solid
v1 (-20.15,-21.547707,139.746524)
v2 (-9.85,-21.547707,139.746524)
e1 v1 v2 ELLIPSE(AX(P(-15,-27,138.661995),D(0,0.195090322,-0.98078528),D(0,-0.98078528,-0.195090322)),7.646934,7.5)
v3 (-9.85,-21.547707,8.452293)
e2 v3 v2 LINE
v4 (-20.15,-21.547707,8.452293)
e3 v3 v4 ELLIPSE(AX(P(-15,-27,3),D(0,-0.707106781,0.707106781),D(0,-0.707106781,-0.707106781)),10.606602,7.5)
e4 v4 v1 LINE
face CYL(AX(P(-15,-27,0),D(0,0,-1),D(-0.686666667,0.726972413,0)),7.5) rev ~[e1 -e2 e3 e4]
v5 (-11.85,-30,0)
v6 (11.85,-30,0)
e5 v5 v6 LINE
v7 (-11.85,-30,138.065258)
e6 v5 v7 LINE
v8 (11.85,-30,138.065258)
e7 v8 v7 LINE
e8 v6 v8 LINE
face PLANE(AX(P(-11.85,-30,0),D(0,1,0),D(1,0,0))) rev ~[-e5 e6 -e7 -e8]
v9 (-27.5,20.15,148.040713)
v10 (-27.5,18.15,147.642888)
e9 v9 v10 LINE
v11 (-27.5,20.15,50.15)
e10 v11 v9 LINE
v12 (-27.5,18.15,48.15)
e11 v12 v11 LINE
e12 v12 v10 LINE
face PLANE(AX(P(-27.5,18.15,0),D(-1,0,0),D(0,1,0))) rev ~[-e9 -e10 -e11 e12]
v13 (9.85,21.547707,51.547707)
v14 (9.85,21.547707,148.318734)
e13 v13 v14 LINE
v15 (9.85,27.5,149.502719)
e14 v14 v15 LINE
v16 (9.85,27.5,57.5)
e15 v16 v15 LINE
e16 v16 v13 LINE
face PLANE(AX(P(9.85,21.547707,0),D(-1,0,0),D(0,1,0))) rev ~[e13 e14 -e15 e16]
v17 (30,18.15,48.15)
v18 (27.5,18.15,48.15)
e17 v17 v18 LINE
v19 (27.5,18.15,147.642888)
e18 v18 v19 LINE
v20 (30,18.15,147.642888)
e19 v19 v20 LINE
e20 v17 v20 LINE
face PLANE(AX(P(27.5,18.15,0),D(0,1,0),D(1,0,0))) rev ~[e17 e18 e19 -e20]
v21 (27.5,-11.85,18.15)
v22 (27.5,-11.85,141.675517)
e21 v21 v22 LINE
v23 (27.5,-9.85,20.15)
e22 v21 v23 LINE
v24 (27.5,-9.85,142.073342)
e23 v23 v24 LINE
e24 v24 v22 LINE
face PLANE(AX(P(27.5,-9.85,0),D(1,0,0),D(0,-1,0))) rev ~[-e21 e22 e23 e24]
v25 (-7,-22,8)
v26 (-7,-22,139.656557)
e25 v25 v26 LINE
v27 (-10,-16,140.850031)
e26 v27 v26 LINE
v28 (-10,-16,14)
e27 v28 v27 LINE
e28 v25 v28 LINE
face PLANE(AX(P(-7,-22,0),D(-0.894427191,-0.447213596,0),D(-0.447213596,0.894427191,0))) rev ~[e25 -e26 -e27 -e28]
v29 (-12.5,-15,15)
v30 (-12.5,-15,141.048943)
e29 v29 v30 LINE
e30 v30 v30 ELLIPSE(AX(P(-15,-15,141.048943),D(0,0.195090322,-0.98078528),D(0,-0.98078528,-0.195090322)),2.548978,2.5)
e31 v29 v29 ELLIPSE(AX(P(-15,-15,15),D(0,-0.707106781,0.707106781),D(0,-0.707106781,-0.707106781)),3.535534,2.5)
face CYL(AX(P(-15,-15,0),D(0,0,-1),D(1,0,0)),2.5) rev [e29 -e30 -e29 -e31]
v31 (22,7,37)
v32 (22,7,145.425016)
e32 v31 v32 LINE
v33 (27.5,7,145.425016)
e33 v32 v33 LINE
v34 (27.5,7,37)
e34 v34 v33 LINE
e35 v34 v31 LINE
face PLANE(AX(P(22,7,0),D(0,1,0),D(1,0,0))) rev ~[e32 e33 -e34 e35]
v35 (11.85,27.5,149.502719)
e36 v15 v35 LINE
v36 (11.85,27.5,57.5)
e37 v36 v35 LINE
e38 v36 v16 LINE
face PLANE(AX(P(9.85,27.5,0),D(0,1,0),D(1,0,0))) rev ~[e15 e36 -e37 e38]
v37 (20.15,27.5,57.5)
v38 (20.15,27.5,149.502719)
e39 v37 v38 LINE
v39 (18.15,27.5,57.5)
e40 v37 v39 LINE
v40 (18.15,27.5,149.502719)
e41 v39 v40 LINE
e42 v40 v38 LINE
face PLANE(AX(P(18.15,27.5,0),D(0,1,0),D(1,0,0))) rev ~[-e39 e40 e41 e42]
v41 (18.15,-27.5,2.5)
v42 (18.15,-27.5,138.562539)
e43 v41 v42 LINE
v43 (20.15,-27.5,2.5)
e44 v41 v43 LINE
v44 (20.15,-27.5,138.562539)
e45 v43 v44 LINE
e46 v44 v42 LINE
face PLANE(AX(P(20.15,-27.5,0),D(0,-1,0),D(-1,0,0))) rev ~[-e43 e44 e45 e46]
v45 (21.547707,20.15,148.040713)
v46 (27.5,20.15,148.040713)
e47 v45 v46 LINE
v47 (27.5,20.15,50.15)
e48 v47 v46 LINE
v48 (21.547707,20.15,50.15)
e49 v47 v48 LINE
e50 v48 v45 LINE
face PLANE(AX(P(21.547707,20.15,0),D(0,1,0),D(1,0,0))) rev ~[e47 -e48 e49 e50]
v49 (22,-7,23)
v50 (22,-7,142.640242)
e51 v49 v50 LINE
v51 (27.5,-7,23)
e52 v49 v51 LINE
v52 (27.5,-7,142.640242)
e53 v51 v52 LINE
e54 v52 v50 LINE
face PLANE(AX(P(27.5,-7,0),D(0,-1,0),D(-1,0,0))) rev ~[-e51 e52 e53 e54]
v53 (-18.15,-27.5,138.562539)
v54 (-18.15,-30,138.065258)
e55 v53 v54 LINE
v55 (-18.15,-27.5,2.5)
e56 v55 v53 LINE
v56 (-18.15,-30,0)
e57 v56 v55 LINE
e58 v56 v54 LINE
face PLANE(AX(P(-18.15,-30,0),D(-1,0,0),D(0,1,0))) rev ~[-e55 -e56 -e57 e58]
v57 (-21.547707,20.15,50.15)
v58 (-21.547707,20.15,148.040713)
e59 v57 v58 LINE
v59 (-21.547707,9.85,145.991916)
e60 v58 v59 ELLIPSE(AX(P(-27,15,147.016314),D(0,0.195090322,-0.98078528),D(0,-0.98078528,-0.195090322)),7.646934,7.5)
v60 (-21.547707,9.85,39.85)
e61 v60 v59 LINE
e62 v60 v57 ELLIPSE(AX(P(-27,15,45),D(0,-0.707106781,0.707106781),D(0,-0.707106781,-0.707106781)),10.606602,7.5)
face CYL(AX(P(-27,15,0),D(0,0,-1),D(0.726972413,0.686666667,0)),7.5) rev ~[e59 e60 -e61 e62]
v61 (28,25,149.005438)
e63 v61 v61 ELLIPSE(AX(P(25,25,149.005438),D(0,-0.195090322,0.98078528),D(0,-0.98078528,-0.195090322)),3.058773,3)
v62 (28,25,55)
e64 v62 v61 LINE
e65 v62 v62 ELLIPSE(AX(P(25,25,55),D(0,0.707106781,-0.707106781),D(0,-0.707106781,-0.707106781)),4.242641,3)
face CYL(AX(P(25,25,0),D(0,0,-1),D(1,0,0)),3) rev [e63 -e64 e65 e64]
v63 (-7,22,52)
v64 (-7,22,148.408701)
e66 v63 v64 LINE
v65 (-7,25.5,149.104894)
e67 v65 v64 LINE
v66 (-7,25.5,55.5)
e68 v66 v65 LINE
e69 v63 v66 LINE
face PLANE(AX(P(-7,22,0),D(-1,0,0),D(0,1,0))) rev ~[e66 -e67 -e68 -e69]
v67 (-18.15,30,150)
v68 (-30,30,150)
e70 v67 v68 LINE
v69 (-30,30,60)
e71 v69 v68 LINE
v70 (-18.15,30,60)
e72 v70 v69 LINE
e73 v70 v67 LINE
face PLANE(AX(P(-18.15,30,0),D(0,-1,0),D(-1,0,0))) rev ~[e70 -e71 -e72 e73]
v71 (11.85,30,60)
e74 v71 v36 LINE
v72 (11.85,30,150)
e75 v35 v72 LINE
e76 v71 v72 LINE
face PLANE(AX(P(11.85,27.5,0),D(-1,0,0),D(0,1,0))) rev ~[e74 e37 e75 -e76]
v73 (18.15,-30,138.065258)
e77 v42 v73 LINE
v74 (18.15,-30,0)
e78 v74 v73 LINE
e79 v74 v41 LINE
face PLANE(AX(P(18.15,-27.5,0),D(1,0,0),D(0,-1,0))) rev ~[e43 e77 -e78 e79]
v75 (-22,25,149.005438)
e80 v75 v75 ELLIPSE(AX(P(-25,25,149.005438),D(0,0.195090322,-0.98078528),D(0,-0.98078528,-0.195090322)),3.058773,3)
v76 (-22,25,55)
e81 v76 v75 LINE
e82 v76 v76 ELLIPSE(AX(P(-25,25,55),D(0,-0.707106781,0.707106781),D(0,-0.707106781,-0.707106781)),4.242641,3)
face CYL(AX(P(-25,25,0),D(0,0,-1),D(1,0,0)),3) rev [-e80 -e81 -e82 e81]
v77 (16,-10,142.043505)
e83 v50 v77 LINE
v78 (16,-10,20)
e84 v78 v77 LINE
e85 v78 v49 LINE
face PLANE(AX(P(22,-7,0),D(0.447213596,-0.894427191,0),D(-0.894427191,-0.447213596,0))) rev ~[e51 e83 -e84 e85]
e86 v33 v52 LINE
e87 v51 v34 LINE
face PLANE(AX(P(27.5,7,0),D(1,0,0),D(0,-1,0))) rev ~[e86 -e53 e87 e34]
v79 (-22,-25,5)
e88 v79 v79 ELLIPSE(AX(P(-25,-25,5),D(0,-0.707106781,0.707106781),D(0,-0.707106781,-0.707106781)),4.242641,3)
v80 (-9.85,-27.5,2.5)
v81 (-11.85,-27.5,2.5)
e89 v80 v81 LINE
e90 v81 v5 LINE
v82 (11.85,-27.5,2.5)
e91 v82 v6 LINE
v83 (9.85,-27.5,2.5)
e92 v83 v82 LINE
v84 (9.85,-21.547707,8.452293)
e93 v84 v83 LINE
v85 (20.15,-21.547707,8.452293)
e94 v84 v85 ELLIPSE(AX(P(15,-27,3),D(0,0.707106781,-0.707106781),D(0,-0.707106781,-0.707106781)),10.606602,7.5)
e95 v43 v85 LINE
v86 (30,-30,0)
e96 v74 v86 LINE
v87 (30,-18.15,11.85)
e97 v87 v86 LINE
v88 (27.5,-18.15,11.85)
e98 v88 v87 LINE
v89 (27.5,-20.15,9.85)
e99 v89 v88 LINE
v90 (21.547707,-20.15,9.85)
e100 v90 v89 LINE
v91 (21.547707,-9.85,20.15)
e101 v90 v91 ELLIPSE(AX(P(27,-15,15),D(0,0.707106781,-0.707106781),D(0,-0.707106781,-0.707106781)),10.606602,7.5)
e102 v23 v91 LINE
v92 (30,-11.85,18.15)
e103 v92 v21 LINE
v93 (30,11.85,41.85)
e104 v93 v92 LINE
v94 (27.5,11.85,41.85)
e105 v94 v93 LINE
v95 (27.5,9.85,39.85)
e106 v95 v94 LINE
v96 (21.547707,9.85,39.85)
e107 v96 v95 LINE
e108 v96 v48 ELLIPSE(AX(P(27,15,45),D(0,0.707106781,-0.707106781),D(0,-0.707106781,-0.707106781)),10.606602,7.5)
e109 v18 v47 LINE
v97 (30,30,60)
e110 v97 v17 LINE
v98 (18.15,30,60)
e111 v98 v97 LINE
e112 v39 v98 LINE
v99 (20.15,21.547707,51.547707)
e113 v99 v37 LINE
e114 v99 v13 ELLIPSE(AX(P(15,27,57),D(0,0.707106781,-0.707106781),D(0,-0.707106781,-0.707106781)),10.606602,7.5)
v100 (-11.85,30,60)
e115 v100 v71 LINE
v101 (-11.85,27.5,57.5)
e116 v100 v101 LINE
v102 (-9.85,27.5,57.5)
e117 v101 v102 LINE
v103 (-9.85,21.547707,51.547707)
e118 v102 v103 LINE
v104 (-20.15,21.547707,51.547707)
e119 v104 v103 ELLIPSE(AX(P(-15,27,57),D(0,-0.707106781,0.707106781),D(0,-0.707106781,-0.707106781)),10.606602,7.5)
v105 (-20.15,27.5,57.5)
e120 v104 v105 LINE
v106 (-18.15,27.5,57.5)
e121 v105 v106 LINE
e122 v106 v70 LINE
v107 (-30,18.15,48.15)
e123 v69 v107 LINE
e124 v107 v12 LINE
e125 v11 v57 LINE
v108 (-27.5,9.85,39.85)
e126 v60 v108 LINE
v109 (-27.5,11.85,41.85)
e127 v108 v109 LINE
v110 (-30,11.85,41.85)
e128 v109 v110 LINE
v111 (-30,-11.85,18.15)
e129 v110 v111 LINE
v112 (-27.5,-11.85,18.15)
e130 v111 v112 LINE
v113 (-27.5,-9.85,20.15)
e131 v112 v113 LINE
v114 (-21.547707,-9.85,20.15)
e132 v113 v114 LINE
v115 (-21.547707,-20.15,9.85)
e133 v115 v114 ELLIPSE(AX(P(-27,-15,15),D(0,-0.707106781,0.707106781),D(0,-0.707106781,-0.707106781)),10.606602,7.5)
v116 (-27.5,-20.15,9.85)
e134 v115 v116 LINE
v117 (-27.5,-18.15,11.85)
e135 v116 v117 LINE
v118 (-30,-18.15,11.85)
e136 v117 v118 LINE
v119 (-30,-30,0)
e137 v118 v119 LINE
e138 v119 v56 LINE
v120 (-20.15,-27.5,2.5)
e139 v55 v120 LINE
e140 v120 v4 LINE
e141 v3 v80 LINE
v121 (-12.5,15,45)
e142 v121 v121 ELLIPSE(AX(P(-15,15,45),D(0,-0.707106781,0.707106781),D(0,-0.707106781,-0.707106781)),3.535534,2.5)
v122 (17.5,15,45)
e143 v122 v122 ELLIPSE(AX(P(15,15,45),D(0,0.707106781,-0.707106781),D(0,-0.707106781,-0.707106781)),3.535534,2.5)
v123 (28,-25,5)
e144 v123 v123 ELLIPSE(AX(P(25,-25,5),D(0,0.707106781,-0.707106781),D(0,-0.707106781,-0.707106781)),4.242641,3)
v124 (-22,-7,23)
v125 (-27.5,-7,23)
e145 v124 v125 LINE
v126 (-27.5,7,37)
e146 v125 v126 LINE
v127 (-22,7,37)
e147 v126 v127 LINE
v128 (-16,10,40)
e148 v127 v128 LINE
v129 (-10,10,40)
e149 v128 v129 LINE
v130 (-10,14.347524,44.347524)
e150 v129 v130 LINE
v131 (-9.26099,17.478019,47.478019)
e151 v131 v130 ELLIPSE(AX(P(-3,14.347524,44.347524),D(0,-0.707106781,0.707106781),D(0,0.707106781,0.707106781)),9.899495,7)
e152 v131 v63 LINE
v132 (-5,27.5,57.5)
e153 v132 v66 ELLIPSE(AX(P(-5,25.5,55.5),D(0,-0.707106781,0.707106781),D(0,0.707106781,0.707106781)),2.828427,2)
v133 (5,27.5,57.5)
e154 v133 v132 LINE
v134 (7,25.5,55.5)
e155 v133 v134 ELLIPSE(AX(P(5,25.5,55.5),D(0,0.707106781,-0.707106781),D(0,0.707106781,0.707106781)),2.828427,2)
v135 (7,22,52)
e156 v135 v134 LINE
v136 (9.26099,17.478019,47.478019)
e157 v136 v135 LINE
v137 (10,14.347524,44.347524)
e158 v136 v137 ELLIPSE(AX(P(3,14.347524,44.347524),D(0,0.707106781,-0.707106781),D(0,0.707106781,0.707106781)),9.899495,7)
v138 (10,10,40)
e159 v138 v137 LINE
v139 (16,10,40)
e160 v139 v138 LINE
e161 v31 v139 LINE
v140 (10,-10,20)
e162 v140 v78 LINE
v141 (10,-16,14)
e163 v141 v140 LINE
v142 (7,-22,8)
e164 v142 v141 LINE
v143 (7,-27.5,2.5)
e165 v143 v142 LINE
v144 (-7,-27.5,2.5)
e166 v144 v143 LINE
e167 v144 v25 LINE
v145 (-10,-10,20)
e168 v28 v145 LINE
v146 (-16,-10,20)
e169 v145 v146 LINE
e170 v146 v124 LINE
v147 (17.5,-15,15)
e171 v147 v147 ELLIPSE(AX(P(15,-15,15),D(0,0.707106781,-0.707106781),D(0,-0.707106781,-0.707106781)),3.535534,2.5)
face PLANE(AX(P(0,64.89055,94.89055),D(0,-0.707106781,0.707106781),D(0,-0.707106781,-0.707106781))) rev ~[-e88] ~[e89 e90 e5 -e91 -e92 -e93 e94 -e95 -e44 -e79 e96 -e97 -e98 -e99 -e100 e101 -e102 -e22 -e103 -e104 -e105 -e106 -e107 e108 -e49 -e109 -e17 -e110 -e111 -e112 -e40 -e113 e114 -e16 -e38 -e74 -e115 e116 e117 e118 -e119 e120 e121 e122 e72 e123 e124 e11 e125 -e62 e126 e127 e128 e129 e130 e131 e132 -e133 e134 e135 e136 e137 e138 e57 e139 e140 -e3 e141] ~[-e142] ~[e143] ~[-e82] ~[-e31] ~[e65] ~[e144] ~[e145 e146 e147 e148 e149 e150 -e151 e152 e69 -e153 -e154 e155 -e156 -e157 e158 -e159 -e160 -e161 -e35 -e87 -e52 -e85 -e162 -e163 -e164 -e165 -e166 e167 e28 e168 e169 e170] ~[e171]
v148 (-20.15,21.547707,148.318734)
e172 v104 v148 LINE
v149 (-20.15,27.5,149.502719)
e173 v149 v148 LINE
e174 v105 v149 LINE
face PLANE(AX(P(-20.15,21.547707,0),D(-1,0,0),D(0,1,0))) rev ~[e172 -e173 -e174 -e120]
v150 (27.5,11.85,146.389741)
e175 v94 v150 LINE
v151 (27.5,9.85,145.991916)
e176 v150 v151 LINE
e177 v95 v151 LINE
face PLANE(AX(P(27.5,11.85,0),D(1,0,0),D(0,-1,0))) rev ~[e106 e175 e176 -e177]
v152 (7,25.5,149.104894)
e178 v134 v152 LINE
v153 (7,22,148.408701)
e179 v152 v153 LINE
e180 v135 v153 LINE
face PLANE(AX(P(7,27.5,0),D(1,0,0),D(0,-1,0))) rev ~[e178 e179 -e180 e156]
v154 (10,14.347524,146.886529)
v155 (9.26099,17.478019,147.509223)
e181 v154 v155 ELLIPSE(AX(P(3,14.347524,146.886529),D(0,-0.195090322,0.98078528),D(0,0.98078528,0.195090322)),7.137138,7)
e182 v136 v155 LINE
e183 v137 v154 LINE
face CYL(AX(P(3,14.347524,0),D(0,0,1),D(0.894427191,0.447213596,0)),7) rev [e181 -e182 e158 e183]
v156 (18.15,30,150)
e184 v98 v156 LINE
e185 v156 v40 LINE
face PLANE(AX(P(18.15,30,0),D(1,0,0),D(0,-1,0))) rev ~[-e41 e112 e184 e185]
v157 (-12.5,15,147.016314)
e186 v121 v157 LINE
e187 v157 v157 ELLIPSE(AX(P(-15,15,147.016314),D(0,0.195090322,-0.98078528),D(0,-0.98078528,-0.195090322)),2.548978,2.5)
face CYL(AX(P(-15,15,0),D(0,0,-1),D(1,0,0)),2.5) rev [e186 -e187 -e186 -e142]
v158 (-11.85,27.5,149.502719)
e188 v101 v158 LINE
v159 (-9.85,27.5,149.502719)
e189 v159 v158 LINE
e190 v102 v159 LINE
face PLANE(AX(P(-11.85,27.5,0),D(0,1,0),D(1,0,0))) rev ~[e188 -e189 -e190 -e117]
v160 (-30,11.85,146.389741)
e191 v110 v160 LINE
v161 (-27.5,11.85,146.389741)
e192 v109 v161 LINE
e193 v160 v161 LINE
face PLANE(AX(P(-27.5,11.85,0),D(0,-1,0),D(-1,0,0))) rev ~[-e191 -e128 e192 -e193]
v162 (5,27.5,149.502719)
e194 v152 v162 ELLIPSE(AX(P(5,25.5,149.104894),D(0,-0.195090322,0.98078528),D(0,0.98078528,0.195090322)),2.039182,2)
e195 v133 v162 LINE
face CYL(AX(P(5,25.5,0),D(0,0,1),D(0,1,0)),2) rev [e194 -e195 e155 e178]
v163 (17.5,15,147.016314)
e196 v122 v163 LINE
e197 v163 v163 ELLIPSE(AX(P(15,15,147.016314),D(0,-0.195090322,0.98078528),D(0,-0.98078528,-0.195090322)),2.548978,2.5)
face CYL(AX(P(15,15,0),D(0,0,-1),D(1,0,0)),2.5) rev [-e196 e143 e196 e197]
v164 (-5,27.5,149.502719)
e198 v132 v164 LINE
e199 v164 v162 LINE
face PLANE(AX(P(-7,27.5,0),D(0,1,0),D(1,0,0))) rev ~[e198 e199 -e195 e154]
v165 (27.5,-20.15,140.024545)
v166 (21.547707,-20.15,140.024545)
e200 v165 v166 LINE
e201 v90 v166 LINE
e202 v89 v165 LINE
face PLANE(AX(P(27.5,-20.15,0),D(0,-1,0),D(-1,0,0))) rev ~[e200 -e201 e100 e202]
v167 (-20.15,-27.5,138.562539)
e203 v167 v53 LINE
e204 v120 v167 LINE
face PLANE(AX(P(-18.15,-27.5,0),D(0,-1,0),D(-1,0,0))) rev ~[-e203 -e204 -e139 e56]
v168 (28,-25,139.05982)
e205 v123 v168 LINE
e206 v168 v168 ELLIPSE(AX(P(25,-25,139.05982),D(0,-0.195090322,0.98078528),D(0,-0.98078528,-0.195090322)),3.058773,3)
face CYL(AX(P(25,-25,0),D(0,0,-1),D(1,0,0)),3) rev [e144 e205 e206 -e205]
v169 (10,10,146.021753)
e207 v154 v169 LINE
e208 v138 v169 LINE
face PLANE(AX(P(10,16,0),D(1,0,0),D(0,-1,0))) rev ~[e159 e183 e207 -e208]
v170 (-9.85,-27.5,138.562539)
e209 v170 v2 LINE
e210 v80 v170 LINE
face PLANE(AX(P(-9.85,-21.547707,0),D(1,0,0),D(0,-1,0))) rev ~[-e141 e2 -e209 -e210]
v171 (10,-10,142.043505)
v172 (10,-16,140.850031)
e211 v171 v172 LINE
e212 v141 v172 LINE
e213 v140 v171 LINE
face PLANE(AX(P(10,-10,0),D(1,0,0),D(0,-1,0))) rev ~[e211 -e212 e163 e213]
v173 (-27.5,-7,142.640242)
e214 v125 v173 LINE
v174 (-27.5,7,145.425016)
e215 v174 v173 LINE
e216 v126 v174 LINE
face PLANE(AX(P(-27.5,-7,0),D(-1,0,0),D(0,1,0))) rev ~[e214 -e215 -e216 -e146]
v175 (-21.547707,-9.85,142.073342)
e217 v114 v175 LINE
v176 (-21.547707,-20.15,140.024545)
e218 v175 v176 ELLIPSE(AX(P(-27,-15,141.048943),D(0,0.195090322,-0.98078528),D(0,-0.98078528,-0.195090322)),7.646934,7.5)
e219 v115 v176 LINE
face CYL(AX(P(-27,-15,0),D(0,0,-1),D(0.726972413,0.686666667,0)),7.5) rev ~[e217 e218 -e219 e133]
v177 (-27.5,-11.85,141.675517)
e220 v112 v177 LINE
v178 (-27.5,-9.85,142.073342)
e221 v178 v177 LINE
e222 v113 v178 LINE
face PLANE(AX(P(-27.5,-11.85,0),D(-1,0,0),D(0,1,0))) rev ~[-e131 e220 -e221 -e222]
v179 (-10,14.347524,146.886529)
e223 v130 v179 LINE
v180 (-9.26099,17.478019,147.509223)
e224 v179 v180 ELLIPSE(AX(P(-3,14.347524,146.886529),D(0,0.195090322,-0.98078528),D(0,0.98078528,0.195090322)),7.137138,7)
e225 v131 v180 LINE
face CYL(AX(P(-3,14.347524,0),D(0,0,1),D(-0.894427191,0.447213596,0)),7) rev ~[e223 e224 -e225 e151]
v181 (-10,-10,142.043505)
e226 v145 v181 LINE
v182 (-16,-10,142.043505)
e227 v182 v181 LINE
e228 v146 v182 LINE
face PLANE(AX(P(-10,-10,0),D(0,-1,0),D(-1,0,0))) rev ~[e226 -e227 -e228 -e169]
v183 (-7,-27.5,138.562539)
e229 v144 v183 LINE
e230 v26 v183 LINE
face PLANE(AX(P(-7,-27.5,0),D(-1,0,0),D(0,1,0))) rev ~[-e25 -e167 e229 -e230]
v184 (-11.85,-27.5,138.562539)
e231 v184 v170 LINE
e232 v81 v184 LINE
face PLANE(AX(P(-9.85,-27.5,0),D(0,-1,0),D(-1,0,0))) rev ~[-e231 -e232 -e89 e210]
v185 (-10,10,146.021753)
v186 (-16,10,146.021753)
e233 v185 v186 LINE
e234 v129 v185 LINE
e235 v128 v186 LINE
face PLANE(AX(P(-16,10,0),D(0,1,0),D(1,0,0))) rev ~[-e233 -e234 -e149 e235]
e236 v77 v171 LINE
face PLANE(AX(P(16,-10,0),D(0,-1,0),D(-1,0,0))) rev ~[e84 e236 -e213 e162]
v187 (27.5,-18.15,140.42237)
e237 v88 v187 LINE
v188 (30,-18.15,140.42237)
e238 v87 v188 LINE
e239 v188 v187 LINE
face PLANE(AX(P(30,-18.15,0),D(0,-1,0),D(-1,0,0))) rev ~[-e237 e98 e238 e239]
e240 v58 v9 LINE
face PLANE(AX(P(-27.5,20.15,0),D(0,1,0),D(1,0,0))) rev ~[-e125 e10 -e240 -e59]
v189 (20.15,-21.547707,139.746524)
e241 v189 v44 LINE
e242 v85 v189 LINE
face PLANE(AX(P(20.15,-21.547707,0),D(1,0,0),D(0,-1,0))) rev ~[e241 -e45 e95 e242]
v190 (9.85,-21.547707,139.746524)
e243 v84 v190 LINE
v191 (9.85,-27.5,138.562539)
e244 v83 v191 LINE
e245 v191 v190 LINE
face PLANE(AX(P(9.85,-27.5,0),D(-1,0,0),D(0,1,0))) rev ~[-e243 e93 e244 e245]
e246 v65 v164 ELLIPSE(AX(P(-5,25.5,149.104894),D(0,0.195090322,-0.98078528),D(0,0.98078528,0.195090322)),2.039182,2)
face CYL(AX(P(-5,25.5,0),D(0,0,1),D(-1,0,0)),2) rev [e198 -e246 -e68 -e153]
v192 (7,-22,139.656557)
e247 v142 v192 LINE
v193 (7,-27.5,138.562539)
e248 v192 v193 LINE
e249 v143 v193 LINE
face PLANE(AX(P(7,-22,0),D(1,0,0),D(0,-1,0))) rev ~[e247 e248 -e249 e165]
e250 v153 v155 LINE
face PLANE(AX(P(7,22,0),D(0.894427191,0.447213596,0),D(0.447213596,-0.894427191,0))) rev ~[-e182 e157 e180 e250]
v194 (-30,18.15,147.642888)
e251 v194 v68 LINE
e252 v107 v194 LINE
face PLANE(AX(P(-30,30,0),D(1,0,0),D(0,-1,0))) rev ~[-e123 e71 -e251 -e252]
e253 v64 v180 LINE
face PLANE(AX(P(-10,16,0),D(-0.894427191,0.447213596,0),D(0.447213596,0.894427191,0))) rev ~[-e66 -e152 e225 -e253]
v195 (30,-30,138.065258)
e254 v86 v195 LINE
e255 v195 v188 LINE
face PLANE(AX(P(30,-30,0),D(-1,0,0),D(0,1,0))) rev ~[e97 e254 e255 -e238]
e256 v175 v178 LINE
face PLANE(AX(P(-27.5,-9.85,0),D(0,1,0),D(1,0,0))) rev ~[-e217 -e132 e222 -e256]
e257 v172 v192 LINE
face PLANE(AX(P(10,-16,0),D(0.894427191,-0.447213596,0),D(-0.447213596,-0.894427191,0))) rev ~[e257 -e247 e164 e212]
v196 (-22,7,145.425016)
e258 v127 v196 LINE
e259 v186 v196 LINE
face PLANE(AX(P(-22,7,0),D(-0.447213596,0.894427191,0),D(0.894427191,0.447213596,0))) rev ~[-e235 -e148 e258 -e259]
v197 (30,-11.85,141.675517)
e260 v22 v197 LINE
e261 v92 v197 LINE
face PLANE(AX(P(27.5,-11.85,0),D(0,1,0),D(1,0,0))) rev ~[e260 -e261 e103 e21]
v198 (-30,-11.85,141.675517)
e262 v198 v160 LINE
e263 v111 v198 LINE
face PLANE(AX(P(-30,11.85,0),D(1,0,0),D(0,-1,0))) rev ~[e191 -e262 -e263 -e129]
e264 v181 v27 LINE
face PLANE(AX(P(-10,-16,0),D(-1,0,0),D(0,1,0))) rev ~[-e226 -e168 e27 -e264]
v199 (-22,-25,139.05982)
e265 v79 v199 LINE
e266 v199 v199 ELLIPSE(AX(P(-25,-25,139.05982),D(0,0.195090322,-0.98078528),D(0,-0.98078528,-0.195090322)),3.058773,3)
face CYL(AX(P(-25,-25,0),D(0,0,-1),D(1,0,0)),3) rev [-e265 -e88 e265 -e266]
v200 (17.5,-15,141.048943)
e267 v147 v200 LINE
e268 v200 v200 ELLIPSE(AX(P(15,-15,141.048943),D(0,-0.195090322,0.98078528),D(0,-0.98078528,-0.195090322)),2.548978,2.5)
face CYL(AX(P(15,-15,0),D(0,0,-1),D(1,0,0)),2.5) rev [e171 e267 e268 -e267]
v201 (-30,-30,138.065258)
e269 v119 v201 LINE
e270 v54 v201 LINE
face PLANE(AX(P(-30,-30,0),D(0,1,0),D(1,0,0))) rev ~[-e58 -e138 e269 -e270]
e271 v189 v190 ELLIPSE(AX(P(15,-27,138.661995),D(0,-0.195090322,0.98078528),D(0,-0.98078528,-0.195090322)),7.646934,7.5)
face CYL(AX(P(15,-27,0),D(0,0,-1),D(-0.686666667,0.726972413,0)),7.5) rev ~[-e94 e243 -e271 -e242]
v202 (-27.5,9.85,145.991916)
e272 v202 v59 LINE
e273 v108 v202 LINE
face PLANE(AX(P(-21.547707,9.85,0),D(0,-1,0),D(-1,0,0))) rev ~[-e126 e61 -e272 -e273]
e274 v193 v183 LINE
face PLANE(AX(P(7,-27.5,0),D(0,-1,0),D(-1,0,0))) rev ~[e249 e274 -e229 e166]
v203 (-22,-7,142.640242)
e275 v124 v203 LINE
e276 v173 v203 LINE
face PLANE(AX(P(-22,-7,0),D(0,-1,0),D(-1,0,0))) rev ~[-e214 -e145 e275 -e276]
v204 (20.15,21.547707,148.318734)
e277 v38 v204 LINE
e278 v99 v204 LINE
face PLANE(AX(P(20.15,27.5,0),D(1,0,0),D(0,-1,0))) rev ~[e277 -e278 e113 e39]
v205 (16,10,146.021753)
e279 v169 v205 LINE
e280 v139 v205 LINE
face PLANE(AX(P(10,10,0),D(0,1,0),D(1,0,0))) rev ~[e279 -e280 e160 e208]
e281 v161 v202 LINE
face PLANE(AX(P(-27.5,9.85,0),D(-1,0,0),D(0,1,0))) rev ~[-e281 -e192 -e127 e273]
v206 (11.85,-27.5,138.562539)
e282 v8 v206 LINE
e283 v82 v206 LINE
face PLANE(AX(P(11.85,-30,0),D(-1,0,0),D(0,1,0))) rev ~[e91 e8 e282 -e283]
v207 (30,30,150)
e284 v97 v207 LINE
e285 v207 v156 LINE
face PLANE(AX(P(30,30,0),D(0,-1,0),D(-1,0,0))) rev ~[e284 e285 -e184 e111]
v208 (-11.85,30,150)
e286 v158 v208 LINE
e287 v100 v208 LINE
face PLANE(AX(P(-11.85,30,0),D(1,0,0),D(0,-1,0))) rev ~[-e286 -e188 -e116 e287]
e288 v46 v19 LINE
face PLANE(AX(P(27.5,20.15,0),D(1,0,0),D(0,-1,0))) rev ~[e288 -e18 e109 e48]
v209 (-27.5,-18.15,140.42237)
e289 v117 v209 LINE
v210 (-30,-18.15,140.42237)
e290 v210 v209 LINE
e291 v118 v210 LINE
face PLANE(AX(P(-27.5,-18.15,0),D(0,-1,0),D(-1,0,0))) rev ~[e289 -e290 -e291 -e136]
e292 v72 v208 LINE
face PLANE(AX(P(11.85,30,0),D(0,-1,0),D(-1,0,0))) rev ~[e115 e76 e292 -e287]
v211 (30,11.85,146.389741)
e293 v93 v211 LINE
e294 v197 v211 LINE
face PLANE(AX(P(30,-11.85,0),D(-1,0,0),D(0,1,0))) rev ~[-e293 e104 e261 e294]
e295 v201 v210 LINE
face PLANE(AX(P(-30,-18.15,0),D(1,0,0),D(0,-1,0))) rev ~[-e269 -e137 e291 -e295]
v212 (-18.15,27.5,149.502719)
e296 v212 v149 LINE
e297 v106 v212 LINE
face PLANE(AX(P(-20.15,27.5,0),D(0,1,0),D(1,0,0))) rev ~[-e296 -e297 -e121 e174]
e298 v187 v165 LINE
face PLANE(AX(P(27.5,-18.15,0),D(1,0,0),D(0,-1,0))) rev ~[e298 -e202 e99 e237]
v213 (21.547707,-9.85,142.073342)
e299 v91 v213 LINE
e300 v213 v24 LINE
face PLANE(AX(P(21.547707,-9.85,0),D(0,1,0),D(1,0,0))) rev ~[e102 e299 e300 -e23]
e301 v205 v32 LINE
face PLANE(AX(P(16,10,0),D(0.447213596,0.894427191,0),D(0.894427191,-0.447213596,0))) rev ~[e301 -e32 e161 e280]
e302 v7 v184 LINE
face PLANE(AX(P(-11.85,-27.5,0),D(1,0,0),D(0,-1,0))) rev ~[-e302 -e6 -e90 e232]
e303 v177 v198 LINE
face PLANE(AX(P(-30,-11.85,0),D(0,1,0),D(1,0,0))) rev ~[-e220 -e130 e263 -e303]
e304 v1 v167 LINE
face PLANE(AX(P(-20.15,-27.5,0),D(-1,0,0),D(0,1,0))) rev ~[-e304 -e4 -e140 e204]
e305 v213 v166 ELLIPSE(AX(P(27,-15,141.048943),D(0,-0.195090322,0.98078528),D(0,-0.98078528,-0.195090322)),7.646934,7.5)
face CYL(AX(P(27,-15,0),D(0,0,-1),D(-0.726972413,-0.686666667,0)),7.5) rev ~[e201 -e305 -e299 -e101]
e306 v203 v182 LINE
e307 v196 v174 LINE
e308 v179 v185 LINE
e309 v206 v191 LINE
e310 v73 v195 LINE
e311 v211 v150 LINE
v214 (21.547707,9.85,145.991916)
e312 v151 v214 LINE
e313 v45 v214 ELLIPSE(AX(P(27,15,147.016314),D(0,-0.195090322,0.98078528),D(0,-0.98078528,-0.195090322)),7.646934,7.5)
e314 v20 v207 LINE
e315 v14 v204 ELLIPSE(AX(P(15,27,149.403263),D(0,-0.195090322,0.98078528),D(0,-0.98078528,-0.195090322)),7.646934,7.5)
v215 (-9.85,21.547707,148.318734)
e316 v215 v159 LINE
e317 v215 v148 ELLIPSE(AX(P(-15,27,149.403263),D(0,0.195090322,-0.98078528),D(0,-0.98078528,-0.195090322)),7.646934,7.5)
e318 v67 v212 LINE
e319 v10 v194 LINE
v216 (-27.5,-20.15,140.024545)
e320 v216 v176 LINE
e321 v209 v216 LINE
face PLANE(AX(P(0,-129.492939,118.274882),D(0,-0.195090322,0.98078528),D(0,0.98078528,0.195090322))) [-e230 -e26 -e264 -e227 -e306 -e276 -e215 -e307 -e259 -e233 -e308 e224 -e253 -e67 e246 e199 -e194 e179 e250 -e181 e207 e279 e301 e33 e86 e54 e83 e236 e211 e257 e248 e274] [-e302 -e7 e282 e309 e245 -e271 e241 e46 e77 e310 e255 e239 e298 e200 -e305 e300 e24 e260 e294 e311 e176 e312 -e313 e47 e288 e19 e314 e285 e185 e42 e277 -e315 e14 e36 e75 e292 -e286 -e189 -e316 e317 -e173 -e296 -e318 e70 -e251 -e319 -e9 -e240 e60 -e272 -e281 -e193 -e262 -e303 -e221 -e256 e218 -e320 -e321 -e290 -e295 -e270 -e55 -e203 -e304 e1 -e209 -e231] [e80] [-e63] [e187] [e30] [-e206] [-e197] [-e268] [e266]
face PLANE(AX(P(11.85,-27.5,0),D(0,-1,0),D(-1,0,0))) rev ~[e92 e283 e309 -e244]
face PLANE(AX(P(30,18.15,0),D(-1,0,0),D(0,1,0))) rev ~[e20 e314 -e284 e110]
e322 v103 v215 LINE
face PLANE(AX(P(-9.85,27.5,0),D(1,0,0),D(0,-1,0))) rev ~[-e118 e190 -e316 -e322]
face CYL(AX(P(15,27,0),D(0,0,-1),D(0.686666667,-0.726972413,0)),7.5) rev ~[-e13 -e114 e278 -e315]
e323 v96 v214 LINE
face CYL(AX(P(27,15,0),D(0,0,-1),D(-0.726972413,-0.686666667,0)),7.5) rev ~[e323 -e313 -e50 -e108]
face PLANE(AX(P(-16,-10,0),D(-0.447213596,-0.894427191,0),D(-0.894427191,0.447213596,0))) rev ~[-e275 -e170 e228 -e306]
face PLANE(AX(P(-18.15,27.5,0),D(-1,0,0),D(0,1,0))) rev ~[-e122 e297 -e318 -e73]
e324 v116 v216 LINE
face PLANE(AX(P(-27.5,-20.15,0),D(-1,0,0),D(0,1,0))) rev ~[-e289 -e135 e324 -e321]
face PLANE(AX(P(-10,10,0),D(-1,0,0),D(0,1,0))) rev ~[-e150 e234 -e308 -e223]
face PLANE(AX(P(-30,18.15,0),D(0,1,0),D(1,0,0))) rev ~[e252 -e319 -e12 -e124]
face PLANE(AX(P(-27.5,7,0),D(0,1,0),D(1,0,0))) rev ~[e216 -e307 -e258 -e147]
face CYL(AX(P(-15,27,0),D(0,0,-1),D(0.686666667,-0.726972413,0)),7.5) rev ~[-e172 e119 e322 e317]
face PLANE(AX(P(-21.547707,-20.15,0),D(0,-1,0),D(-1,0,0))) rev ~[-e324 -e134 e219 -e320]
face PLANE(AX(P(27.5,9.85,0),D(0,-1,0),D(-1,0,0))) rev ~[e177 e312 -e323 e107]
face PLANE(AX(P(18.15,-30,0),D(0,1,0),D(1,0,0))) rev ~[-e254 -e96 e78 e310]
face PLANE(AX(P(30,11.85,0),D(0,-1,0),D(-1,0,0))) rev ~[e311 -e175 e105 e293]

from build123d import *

# Parameters (mm, degrees)
F0_R          = 3
F0_R_2        = 2.5
F1_DEPTH      = 150
F2_R          = 2
F3_R          = 7
F6_DEPTH      = 30
F6_DEPTH_BACK = 30


# Not quite as in the source:
# - a feature names something its author has since deleted; it is built from what else it names


with BuildPart() as f1:
    # F0 (on Top) → F1 (new body)
    with BuildSketch(Plane.XY):
        with BuildLine():
            Line((18.15, -30), (30, -30))
            Line((30, -30), (30, -18.15))
            Line((30, -18.15), (27.5, -18.15))
            Line((27.5, -18.15), (27.5, -20.15))
            Line((27.5, -20.15), (21.5477069044, -20.15))
            ThreePointArc((21.5477069044, -20.15), (19.5, -15), (21.5477069044, -9.85))
            Line((21.5477069044, -9.85), (27.5, -9.85))
            Line((27.5, -9.85), (27.5, -11.85))
            Line((27.5, -11.85), (30, -11.85))
            Line((30, -11.85), (30, 11.85))
            Line((30, 11.85), (27.5, 11.85))
            Line((27.5, 11.85), (27.5, 9.85))
            Line((27.5, 9.85), (21.5477069044, 9.85))
            ThreePointArc((21.5477069044, 9.85), (19.5, 15), (21.5477069044, 20.15))
            Line((21.5477069044, 20.15), (27.5, 20.15))
            Line((27.5, 20.15), (27.5, 18.15))
            Line((27.5, 18.15), (30, 18.15))
            Line((30, 18.15), (30, 30))
            Line((30, 30), (18.15, 30))
            Line((18.15, 30), (18.15, 27.5))
            Line((18.15, 27.5), (20.15, 27.5))
            Line((20.15, 27.5), (20.15, 21.5477069044))
            ThreePointArc((20.15, 21.5477069044), (15, 19.5), (9.85, 21.5477069044))
            Line((9.85, 21.5477069044), (9.85, 27.5))
            Line((9.85, 27.5), (11.85, 27.5))
            Line((11.85, 27.5), (11.85, 30))
            Line((11.85, 30), (-11.85, 30))
            Line((-11.85, 30), (-11.85, 27.5))
            Line((-11.85, 27.5), (-9.85, 27.5))
            Line((-9.85, 27.5), (-9.85, 21.5477069044))
            ThreePointArc((-9.85, 21.5477069044), (-15, 19.5), (-20.15, 21.5477069044))
            Line((-20.15, 21.5477069044), (-20.15, 27.5))
            Line((-20.15, 27.5), (-18.15, 27.5))
            Line((-18.15, 27.5), (-18.15, 30))
            Line((-18.15, 30), (-30, 30))
            Line((-30, 30), (-30, 18.15))
            Line((-30, 18.15), (-27.5, 18.15))
            Line((-27.5, 18.15), (-27.5, 20.15))
            Line((-27.5, 20.15), (-21.5477069044, 20.15))
            ThreePointArc((-21.5477069044, 20.15), (-19.5, 15), (-21.5477069044, 9.85))
            Line((-21.5477069044, 9.85), (-27.5, 9.85))
            Line((-27.5, 9.85), (-27.5, 11.85))
            Line((-27.5, 11.85), (-30, 11.85))
            Line((-30, 11.85), (-30, -11.85))
            Line((-30, -11.85), (-27.5, -11.85))
            Line((-27.5, -11.85), (-27.5, -9.85))
            Line((-27.5, -9.85), (-21.5477069044, -9.85))
            ThreePointArc((-21.5477069044, -9.85), (-19.5, -15), (-21.5477069044, -20.15))
            Line((-21.5477069044, -20.15), (-27.5, -20.15))
            Line((-27.5, -20.15), (-27.5, -18.15))
            Line((-27.5, -18.15), (-30, -18.15))
            Line((-30, -18.15), (-30, -30))
            Line((-30, -30), (-18.15, -30))
            Line((-18.15, -30), (-18.15, -27.5))
            Line((-18.15, -27.5), (-20.15, -27.5))
            Line((-20.15, -27.5), (-20.15, -21.5477069044))
            ThreePointArc((-20.15, -21.5477069044), (-15, -19.5), (-9.85, -21.5477069044))
            Line((-9.85, -21.5477069044), (-9.85, -27.5))
            Line((-9.85, -27.5), (-11.85, -27.5))
            Line((-11.85, -27.5), (-11.85, -30))
            Line((-11.85, -30), (11.85, -30))
            Line((11.85, -30), (11.85, -27.5))
            Line((11.85, -27.5), (9.85, -27.5))
            Line((9.85, -27.5), (9.85, -21.5477069044))
            ThreePointArc((9.85, -21.5477069044), (15, -19.5), (20.15, -21.5477069044))
            Line((20.15, -21.5477069044), (20.15, -27.5))
            Line((20.15, -27.5), (18.15, -27.5))
            Line((18.15, -27.5), (18.15, -30))
        make_face()
        with Locations((-25, -25)):
            Circle(F0_R, mode=Mode.SUBTRACT)
        with Locations((-15, -15)):
            Circle(F0_R_2, mode=Mode.SUBTRACT)
        with Locations((25, -25)):
            Circle(F0_R, mode=Mode.SUBTRACT)
        with Locations((15, -15)):
            Circle(F0_R_2, mode=Mode.SUBTRACT)
        with Locations((-25, 25)):
            Circle(F0_R, mode=Mode.SUBTRACT)
        with Locations((-15, 15)):
            Circle(F0_R_2, mode=Mode.SUBTRACT)
        Polygon((-7, 22), (-7, 27.5), (0, 27.5), (7, 27.5), (7, 22), (10, 16), (10, 10), (16, 10), (22, 7), (27.5, 7), (27.5, 0), (27.5, -7), (22, -7), (16, -10), (10, -10), (10, -16), (7, -22), (7, -27.5), (0, -27.5), (-7, -27.5), (-7, -22), (-10, -16), (-10, -10), (-16, -10), (-22, -7), (-27.5, -7), (-27.5, 0), (-27.5, 7), (-22, 7), (-16, 10), (-10, 10), (-10, 16), align=None, mode=Mode.SUBTRACT)
        with Locations((15, 15)):
            Circle(F0_R_2, mode=Mode.SUBTRACT)
        with Locations((25, 25)):
            Circle(F0_R, mode=Mode.SUBTRACT)
    extrude(amount=F1_DEPTH)

    # F2
    f2_edges = [f1.edges().sort_by_distance(p)[0] for p in [
        (-7, 27.5, 75),
        (7, 27.5, 75),
    ]]
    fillet(f2_edges, radius=F2_R)

    # F3
    f3_edges = [f1.edges().sort_by_distance(p)[0] for p in [
        (-10, 16, 75),
        (10, 16, 75),
    ]]
    fillet(f3_edges, radius=F3_R)

    # F5 (on Right) → F6 (cut, two sides)
    with BuildSketch(Plane.YZ) as f6_sk:
        Polygon((115.2614038106, 44.5196963257), (64.8905500682, 94.8905500682), (-30, 0), (20.3708537424, -50.3708537424), align=None)
        Polygon((30, 150), (10.7683995954, 246.6837842107), (-148.7245392843, 214.9586661578), (-129.4929388797, 118.2748819471), align=None)
    extrude(amount=F6_DEPTH, mode=Mode.SUBTRACT)
    extrude(f6_sk.sketch, amount=-F6_DEPTH_BACK, mode=Mode.SUBTRACT)


solid = f1.part
